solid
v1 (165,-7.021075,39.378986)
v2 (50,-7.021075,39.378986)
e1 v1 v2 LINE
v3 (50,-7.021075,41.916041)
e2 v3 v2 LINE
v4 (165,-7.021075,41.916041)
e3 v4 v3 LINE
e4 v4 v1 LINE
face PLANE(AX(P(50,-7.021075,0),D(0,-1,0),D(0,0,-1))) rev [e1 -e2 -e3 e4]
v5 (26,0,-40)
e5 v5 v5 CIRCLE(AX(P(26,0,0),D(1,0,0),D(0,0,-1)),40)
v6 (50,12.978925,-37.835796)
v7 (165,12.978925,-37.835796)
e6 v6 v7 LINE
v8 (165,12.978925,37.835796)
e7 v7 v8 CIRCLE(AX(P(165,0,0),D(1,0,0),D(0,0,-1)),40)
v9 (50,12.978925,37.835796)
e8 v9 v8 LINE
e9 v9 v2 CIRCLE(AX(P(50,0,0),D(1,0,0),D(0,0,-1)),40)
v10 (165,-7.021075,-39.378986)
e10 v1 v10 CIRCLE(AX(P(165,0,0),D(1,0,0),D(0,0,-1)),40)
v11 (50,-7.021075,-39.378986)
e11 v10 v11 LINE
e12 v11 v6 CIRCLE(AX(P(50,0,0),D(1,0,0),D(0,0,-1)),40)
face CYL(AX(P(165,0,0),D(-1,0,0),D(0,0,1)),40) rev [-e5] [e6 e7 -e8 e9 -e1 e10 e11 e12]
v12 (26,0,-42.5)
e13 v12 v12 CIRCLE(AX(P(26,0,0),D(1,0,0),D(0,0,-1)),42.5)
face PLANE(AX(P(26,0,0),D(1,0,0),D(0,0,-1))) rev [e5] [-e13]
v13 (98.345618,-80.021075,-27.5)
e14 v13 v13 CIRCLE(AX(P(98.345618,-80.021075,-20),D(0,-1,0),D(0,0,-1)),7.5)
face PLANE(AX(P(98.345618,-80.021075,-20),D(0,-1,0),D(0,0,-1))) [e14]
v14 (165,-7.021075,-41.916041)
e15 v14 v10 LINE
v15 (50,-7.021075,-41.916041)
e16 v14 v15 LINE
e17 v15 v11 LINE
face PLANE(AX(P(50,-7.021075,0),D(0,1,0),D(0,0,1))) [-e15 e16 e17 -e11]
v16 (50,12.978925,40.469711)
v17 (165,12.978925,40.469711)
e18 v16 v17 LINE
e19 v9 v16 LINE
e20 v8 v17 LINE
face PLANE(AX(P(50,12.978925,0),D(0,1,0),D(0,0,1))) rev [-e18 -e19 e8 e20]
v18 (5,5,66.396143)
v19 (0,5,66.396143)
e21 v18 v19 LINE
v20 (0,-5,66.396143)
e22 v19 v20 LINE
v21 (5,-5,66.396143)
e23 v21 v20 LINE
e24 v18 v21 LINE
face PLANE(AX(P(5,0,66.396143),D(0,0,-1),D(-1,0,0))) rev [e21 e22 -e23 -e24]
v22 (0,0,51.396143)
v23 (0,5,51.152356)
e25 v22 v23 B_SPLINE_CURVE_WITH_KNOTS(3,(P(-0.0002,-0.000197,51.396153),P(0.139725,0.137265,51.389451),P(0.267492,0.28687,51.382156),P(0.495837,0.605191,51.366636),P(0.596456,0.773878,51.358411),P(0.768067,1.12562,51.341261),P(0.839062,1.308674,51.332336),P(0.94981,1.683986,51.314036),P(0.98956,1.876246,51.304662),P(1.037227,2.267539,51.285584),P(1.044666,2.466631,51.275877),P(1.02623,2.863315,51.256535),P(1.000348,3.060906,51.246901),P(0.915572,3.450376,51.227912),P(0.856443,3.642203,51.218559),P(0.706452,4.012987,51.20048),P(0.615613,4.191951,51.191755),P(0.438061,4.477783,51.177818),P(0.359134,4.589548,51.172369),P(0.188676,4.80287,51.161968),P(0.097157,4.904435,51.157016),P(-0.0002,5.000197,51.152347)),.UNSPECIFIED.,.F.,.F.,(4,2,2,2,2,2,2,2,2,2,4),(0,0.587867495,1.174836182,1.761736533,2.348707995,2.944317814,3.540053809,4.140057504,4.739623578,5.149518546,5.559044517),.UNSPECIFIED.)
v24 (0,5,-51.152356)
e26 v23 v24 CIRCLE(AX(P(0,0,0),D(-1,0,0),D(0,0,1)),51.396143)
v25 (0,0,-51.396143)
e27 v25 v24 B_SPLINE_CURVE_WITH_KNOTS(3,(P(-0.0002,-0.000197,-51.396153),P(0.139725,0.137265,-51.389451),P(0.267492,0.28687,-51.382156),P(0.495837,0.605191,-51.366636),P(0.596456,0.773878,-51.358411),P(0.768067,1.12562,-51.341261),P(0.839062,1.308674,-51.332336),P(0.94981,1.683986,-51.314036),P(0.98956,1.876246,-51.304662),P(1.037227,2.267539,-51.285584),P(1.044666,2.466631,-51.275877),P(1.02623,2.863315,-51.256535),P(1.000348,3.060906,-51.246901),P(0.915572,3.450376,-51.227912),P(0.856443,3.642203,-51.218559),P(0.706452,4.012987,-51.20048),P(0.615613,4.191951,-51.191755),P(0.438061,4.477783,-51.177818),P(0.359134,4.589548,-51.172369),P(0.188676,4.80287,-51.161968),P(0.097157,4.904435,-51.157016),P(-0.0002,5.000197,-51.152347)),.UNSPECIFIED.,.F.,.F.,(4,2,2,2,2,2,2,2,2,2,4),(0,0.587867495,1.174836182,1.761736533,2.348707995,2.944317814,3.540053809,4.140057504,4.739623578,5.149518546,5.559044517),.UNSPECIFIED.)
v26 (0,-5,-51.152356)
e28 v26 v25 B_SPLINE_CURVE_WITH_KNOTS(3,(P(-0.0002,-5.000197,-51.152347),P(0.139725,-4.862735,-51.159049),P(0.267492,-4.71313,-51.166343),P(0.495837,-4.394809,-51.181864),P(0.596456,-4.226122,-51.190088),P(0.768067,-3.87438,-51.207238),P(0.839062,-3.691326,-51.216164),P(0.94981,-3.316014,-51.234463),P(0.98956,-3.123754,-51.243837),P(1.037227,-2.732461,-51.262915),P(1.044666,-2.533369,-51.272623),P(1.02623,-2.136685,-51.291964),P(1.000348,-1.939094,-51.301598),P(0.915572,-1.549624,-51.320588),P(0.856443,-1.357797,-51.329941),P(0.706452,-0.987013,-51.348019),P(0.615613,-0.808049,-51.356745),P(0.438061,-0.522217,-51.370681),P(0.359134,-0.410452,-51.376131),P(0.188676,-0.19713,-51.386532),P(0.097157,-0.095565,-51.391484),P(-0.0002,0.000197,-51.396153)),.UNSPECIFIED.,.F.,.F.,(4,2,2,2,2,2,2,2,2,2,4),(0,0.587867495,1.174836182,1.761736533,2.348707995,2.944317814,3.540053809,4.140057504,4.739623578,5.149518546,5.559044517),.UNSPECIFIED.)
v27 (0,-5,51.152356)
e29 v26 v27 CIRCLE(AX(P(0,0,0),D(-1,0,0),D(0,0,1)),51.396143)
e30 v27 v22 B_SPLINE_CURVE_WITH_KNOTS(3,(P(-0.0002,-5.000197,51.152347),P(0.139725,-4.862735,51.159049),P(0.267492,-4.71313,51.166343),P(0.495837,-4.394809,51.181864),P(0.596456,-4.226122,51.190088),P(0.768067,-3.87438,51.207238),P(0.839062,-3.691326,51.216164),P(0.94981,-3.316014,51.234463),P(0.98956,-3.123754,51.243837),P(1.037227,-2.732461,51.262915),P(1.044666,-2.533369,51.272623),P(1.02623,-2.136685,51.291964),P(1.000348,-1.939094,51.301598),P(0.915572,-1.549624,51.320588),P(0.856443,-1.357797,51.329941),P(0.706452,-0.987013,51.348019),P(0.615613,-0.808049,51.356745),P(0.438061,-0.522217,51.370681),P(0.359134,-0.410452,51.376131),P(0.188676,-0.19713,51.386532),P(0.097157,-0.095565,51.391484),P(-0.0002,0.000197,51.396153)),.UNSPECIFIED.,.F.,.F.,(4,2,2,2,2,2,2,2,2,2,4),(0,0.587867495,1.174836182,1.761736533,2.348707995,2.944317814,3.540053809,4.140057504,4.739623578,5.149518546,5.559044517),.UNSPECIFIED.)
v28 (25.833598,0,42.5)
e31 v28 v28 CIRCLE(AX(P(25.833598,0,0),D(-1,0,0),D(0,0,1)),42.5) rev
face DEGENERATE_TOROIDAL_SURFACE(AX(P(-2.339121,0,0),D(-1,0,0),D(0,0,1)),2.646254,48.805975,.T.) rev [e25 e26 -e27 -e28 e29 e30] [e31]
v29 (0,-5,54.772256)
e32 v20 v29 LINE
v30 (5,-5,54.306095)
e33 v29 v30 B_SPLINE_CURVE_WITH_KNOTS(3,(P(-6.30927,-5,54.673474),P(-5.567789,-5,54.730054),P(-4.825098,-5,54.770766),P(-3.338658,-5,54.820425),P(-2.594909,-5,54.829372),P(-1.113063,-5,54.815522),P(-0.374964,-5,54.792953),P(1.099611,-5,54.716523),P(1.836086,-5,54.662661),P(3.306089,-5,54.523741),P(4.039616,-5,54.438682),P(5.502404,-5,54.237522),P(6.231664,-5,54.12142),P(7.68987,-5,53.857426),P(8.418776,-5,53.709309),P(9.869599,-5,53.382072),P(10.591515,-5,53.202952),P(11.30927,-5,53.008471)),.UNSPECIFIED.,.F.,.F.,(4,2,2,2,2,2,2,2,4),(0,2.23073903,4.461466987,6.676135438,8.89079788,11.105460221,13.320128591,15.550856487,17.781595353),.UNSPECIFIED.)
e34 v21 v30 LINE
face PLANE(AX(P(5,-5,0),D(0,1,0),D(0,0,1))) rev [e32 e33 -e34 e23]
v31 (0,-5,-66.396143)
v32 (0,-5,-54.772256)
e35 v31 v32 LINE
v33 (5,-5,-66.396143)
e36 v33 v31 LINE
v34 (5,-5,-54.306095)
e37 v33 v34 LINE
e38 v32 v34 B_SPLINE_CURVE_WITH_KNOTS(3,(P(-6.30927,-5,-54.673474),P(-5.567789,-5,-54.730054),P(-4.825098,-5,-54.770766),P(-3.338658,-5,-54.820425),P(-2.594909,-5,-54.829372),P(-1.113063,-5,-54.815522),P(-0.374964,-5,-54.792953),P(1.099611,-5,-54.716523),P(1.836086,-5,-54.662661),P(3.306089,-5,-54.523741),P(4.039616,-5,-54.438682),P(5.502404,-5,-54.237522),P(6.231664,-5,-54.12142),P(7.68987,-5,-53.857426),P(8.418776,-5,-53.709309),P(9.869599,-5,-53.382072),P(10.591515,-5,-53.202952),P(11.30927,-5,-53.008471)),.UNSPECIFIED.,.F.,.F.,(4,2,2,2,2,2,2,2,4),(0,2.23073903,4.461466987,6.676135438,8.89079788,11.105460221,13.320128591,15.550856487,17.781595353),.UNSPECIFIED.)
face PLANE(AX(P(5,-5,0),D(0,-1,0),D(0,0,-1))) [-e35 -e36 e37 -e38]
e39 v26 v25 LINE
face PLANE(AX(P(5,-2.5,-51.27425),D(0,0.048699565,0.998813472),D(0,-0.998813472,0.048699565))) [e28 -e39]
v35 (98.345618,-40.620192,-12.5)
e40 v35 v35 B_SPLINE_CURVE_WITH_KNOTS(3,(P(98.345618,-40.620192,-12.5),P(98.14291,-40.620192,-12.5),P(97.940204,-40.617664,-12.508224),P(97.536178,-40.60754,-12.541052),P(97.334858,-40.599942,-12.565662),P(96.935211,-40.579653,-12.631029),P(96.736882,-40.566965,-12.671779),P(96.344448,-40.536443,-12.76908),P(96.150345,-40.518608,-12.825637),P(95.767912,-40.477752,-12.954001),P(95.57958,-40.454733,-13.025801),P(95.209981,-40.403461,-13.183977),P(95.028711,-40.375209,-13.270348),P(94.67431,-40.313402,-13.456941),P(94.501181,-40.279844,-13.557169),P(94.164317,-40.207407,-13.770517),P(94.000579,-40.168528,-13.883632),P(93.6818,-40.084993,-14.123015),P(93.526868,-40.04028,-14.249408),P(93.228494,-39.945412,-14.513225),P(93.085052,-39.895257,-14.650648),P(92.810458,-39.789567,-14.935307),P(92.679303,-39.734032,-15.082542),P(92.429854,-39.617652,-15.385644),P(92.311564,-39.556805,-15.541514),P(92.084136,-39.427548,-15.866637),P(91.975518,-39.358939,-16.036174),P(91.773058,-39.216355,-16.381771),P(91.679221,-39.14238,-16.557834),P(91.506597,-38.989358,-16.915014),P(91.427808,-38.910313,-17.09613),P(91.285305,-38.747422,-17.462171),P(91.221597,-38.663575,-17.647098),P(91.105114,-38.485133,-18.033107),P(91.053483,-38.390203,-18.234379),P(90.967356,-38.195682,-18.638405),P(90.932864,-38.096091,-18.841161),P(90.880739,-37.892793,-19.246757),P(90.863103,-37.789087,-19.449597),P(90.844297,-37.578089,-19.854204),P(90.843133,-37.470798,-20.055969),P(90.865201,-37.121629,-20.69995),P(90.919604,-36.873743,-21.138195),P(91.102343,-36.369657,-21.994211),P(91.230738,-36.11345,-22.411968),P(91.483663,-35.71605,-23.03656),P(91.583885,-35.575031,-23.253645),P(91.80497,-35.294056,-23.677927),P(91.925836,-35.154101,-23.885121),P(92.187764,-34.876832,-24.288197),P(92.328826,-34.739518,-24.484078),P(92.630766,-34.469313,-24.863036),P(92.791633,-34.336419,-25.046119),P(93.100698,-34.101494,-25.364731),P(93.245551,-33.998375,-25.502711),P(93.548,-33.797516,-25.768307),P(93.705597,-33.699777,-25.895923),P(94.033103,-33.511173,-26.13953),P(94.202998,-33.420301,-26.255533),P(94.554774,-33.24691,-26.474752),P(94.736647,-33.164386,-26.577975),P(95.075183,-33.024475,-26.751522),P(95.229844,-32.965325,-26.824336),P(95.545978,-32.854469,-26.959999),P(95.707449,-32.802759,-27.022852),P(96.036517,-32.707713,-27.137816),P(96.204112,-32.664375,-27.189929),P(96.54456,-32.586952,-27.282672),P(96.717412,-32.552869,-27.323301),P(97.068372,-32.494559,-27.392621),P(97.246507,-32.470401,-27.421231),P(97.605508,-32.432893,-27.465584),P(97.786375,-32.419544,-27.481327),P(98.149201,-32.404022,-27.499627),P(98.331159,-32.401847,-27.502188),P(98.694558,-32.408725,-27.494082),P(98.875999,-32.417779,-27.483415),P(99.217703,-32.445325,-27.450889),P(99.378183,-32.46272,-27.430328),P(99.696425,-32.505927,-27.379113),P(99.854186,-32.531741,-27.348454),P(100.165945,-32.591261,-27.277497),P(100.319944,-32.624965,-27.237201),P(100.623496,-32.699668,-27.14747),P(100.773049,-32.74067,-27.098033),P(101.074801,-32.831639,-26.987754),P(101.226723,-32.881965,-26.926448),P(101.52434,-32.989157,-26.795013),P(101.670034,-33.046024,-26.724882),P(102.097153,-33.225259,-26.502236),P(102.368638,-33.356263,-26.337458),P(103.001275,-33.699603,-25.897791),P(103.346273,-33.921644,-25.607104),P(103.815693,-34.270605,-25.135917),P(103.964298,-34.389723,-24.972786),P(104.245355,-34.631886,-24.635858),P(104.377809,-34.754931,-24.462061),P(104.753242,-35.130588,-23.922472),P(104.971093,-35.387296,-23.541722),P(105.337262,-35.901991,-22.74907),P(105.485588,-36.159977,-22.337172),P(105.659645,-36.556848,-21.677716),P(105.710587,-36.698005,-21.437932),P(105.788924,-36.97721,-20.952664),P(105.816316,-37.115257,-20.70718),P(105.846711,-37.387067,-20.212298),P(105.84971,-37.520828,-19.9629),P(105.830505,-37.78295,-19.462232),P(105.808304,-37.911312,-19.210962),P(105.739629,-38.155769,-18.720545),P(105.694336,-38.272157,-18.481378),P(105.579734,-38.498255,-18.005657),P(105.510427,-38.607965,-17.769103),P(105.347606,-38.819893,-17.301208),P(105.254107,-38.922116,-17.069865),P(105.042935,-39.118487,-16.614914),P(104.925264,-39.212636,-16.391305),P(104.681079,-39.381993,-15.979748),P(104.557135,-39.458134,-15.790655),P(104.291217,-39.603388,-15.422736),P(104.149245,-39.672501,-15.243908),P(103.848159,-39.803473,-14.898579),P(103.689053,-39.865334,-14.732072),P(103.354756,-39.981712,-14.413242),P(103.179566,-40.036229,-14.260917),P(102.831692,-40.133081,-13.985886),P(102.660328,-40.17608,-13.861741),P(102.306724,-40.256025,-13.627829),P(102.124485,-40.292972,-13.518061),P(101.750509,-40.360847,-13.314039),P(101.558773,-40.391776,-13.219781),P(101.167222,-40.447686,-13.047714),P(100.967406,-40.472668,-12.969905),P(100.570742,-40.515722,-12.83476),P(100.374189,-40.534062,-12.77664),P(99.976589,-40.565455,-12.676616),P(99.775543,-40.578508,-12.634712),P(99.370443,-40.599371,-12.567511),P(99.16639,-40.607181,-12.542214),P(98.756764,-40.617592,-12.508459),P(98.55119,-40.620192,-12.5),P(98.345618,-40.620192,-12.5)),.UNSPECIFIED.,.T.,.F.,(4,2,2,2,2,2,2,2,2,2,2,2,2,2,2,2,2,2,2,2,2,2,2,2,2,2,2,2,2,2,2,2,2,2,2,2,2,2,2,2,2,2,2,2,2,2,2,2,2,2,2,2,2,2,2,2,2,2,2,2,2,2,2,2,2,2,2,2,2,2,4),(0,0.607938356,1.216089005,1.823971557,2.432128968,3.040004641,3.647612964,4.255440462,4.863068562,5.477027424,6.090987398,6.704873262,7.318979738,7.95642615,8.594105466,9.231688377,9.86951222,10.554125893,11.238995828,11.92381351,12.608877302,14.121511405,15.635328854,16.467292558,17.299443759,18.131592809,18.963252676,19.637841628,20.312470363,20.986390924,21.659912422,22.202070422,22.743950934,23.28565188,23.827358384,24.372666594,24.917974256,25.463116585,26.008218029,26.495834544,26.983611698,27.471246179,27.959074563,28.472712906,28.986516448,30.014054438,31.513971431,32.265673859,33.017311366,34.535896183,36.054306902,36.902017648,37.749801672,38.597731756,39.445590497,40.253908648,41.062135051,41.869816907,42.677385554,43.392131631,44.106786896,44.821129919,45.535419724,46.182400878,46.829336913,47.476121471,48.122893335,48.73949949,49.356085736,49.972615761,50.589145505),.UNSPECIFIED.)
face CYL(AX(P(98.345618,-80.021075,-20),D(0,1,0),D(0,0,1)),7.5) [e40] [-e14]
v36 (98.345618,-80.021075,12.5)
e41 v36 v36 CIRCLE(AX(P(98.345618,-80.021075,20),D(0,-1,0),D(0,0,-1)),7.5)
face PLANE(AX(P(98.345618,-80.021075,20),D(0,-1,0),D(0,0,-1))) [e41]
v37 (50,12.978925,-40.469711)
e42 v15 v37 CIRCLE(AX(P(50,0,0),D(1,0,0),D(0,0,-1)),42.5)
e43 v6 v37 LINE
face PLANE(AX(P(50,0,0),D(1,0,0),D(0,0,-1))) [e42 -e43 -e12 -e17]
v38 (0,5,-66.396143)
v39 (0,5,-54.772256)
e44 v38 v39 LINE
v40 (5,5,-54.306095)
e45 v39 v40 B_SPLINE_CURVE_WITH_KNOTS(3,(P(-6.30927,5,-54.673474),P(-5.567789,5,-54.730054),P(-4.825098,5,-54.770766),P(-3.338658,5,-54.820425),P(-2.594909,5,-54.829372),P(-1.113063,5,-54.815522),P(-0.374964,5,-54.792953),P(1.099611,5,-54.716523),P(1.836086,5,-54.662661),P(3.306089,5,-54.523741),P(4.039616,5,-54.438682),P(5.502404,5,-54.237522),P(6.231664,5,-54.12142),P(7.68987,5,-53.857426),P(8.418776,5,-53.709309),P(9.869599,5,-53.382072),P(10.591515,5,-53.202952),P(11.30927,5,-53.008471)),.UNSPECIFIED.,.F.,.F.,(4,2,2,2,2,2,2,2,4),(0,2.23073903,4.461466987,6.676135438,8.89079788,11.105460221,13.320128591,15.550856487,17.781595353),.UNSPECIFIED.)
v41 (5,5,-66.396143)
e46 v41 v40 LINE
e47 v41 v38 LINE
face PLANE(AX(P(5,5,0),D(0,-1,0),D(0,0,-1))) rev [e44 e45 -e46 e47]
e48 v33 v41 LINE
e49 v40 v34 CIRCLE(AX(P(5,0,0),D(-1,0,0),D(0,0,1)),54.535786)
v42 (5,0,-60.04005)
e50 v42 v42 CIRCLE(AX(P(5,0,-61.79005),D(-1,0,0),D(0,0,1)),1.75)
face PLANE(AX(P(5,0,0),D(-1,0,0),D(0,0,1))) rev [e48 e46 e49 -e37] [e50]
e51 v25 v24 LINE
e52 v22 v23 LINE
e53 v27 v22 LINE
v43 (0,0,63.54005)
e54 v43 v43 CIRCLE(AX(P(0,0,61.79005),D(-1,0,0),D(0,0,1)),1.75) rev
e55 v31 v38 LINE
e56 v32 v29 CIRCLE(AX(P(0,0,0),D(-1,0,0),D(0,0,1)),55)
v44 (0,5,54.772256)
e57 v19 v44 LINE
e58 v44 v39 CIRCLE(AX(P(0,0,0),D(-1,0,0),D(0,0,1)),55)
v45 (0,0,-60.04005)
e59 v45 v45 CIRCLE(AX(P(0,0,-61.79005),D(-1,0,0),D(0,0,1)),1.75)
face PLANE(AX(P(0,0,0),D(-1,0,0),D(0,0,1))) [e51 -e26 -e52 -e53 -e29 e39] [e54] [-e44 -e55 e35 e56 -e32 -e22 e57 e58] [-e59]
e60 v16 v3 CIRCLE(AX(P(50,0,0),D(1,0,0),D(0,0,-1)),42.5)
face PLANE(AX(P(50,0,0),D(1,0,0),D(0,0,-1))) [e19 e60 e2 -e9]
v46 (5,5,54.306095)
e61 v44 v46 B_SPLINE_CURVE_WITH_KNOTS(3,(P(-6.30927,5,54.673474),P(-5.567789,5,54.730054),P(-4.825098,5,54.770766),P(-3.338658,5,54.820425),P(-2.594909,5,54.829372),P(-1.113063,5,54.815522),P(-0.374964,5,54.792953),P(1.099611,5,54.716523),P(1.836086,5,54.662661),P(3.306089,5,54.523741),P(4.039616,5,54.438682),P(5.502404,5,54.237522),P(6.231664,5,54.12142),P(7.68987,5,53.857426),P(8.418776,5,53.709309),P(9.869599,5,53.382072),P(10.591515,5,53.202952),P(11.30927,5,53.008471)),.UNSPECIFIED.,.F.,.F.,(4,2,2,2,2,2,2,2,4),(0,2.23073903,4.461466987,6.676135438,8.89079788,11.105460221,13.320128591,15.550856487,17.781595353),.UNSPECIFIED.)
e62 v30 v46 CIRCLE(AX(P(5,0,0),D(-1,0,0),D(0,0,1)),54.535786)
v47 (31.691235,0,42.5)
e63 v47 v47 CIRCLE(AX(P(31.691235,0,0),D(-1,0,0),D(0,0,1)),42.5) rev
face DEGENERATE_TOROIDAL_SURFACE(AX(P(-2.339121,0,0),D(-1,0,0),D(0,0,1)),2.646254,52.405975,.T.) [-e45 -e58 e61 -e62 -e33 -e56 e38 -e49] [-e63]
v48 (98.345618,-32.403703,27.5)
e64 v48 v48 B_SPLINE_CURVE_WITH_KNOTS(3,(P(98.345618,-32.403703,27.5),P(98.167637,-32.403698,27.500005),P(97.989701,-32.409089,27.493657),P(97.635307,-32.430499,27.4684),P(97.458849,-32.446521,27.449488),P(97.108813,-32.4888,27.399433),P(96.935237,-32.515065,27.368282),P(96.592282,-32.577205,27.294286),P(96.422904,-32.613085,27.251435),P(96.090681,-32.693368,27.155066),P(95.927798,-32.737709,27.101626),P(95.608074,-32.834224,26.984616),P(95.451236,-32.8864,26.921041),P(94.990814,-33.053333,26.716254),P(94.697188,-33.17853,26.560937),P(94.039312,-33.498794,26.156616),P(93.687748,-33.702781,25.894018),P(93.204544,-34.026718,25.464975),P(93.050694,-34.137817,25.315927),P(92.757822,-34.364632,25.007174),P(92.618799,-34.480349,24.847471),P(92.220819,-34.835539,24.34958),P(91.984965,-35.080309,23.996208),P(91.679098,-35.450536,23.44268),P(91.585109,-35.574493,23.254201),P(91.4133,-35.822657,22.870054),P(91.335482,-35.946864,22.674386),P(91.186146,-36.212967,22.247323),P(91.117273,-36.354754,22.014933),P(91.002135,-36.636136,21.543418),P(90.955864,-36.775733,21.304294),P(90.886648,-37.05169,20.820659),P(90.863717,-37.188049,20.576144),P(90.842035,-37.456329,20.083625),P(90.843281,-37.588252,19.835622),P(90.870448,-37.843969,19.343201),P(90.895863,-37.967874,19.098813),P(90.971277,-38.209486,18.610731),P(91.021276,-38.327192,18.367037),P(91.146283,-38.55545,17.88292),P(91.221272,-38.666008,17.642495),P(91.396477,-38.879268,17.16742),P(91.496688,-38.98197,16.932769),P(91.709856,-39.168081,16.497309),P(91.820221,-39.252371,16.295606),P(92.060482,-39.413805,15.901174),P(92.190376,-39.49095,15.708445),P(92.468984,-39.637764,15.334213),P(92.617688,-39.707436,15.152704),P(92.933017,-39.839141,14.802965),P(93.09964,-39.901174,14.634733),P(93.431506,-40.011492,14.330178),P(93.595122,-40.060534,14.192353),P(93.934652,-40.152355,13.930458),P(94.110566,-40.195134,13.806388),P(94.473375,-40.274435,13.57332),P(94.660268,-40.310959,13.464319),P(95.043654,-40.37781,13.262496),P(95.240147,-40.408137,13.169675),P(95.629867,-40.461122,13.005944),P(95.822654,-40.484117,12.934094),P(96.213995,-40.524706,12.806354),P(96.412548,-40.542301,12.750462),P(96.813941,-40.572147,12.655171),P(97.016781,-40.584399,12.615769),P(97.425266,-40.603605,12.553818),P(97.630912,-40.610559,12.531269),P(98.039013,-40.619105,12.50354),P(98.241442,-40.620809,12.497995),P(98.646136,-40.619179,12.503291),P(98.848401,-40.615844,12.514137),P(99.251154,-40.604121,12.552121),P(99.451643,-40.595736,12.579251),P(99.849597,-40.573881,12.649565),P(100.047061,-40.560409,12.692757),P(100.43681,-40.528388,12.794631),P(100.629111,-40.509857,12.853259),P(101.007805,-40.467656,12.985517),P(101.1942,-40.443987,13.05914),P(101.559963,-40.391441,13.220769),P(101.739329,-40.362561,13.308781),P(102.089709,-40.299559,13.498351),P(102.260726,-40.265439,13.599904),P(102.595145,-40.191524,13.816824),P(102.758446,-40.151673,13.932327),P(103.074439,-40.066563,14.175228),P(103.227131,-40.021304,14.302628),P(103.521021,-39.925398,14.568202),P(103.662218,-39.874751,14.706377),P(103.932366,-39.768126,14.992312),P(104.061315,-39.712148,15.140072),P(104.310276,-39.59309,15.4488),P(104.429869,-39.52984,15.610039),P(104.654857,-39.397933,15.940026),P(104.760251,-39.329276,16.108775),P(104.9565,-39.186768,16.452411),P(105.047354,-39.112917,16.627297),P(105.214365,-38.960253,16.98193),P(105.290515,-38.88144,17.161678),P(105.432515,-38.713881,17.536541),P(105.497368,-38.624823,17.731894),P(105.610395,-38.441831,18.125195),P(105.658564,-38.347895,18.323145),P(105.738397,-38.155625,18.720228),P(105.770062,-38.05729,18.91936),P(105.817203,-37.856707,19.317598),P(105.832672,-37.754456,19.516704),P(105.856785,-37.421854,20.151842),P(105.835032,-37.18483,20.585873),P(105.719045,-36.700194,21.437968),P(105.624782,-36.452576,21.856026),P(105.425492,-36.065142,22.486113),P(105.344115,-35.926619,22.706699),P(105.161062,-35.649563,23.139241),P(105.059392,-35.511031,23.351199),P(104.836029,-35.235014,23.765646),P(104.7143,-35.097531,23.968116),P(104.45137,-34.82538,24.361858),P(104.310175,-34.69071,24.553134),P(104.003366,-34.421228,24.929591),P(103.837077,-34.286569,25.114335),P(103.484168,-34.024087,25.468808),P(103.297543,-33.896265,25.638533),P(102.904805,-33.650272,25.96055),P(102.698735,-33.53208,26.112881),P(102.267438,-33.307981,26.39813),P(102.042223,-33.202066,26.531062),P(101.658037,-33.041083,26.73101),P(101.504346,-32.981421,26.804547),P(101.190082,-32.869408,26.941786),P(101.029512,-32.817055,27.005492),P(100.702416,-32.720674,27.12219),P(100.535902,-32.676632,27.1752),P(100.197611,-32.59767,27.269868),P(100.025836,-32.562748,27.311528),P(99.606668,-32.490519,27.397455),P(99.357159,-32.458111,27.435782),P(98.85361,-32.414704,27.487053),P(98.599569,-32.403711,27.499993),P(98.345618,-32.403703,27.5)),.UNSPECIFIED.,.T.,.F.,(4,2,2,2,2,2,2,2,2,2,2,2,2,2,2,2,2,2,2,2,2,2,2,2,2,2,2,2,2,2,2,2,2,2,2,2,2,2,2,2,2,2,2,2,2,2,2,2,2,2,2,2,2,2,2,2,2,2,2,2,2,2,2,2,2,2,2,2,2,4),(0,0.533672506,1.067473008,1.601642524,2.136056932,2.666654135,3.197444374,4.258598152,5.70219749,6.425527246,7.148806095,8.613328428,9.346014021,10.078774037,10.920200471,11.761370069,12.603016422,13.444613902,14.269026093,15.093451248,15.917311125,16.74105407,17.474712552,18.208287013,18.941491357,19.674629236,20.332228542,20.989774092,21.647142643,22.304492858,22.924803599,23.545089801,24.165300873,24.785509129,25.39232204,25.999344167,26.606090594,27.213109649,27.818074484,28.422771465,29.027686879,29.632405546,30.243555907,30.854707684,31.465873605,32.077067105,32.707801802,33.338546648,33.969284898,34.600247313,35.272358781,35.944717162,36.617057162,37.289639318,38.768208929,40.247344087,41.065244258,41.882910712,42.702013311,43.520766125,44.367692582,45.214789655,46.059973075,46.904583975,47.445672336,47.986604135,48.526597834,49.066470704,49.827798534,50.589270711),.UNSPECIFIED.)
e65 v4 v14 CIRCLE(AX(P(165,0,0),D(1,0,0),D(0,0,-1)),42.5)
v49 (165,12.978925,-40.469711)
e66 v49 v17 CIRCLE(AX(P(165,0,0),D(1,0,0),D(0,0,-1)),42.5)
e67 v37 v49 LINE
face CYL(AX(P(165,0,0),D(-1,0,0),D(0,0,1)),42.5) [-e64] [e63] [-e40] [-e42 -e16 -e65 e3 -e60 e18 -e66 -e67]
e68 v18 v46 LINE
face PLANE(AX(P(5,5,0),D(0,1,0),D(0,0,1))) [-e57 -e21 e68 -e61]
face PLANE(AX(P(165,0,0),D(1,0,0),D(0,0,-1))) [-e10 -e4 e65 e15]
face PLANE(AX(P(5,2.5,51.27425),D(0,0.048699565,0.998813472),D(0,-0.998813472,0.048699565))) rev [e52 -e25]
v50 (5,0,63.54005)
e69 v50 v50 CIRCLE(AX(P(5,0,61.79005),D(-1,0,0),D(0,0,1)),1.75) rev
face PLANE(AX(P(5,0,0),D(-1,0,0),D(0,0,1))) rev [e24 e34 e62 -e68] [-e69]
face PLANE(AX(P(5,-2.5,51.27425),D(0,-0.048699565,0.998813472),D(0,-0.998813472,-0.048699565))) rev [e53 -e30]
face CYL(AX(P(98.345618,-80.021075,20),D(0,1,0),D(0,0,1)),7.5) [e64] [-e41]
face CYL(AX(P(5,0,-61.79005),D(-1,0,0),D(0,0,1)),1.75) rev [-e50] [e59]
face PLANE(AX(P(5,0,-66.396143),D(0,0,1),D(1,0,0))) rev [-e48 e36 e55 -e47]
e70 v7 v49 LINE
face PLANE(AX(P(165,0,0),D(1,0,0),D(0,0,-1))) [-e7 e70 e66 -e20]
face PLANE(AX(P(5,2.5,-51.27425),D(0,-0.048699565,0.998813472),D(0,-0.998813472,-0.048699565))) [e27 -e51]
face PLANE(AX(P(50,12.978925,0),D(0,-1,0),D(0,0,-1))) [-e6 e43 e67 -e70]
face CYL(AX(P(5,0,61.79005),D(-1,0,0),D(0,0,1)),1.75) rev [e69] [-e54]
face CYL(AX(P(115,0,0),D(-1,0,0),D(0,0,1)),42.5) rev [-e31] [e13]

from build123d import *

# Parameters (mm, degrees)
CUT_EXTRUDE1_DEPTH              = 85
CUT_EXTRUDE1_DEPTH_BACK         = 30
SKETCH2_R                       = 42.5
BOSS_EXTRUDE1_DEPTH             = 135
BOSS_EXTRUDE1_DEPTH_BACK        = 4
SKETCH3_R                       = 42.5
SKETCH3_R_2                     = 40
CUT_EXTRUDE2_START              = -115
CUT_EXTRUDE2_DEPTH              = 115
BOSS_EXTRUDE3_REACH             = 208.879
BOSS_EXTRUDE3_END_RADIUS        = 42.5
SKETCH7_R                       = 7.5
BOSS_EXTRUDE3_DIRECTION_2_DEPTH = 23
SKETCH8_R                       = 1.75
BOSS_EXTRUDE4_DEPTH             = 5


# Read off the part's stored shape, not the designer's step: Shell1
with BuildPart() as part:
    # Sketch1 → Revolve1 (revolve)
    with BuildSketch(Plane(origin=(0, 0, 0), x_dir=(1, 0, 0), z_dir=(0, 1, 0))):
        with BuildLine():
            Line((0, 0), (50, 0))
            ThreePointArc((50, 0), (36.43816018, 37.898327436), (0, 55))
            Line((0, 55), (0, 0))
        make_face()
    revolve(axis=Axis((0, 0, 0), (1, 0, 0)))

    # Shell1 outline → Shell1 (revolve, cut)
    with BuildSketch(Plane.YX):
        with BuildLine():
            add(Edge.make_bspline(
                [(51.396143239, 0), (50.757559449, 13.308797838), (45.305252471, 29.157669604), (32.638691052, 41.565710517), (16.262834021, 46.466854434), (2.111028419, 46.466854274), (1.578625505, 46.459517426), (1.049215582, 46.444998454), (0.522958084, 46.423458206), (0, 46.395061716)],
                knots=[4.717788708, 4.717788708, 4.717788708, 4.717788708, 4.717788708, 4.717788708, 6.23524, 6.23524, 6.23524, 6.23524, 6.294886198, 6.294886198, 6.294886198, 6.294886198, 6.294886198, 6.294886198], degree=5, weights=[1, 1, 0.970217445, 0.968892719, 1, 1, 1.000000024, 1.000000027, 1, 1]))
            Line((0, 46.395061716), (0, 0))
            Line((0, 0), (51.396143239, 0))
        make_face()
    revolve(axis=Axis((0, 0, 0), (1, 0, 0)), mode=Mode.SUBTRACT)

    # Sketch2 → Cut-Extrude1 (cut, two sides: drawn at the far end of the back side and taken through both)
    with BuildSketch(Plane(origin=(30, 0, 0), x_dir=(0, 0, -1), z_dir=(1, 0, 0)).offset(-CUT_EXTRUDE1_DEPTH_BACK)):
        with Locations(Location((0, 0, 0), (0, 0, 180))):
            Circle(SKETCH2_R)
    extrude(amount=CUT_EXTRUDE1_DEPTH + CUT_EXTRUDE1_DEPTH_BACK, mode=Mode.SUBTRACT)

    # Sketch3 → Boss-Extrude1 (add, two sides: drawn at the far end of the back side and taken through both)
    with BuildSketch(Plane(origin=(30, 0, 0), x_dir=(0, 0, -1), z_dir=(1, 0, 0)).offset(-BOSS_EXTRUDE1_DEPTH_BACK)):
        with Locations(Location((0, 0, 0), (0, 0, 180))):
            Circle(SKETCH3_R)
        Circle(SKETCH3_R_2, mode=Mode.SUBTRACT)
    extrude(amount=BOSS_EXTRUDE1_DEPTH + BOSS_EXTRUDE1_DEPTH_BACK)

    # Sketch4 → Cut-Extrude2 (cut)
    with BuildSketch(Plane(origin=(165, 0, 0), x_dir=(0, 0, -1), z_dir=(1, 0, 0)).offset(CUT_EXTRUDE2_START)):
        with BuildLine():
            Line((45.575841937, 12.978925493), (40.46971081, 12.978925493))
            ThreePointArc((40.46971081, 12.978925493), (41.989360018, 6.568382243), (42.5, 0))
            ThreePointArc((42.5, 0), (42.353758703, -3.522658622), (41.916041234, -7.021074507))
            Line((41.916041234, -7.021074507), (45.575841937, -7.021074507))
            Line((45.575841937, -7.021074507), (45.575841937, 12.978925493))
        make_face()
        with BuildLine():
            ThreePointArc((40, 0), (39.455239564, 6.579063078), (37.835796451, 12.978925493))
            Line((37.835796451, 12.978925493), (35.575841937, 12.978925493))
            Line((35.575841937, 12.978925493), (35.575841937, 2.978925493))
            Line((35.575841937, 2.978925493), (35.575841937, -7.021074507))
            Line((35.575841937, -7.021074507), (39.378985675, -7.021074507))
            ThreePointArc((39.378985675, -7.021074507), (39.844443948, -3.524242686), (40, 0))
        make_face()
        with BuildLine():
            ThreePointArc((42.5, 0), (41.989360018, 6.568382243), (40.46971081, 12.978925493))
            Line((40.46971081, 12.978925493), (37.835796451, 12.978925493))
            ThreePointArc((37.835796451, 12.978925493), (39.455239564, 6.579063078), (40, 0))
            ThreePointArc((40, 0), (39.844443948, -3.524242686), (39.378985675, -7.021074507))
            Line((39.378985675, -7.021074507), (41.916041234, -7.021074507))
            ThreePointArc((41.916041234, -7.021074507), (42.353758703, -3.522658622), (42.5, 0))
        make_face()
        with BuildLine():
            Line((-37.835796451, 12.978925493), (-40.46971081, 12.978925493))
            ThreePointArc((-40.46971081, 12.978925493), (-42.389303309, 3.065446952), (-41.916041234, -7.021074507))
            Line((-41.916041234, -7.021074507), (-39.378985675, -7.021074507))
            ThreePointArc((-39.378985675, -7.021074507), (-39.881457404, 3.077231765), (-37.835796451, 12.978925493))
        make_face()
        with BuildLine():
            Line((-35.575841937, 12.978925493), (-37.835796451, 12.978925493))
            ThreePointArc((-37.835796451, 12.978925493), (-39.881457404, 3.077231765), (-39.378985675, -7.021074507))
            Line((-39.378985675, -7.021074507), (-35.575841937, -7.021074507))
            Line((-35.575841937, -7.021074507), (-35.575841937, 2.978925493))
            Line((-35.575841937, 2.978925493), (-35.575841937, 12.978925493))
        make_face()
    extrude(amount=CUT_EXTRUDE2_DEPTH, mode=Mode.SUBTRACT)

    # Boss-Extrude3: up to this cylinder (the profile starts outside it)
    boss_extrude3_end = Plane(origin=(98.345618, 0, 0), z_dir=(-1, 0, 0)) * Cylinder(BOSS_EXTRUDE3_END_RADIUS, 503.758, mode=Mode.PRIVATE)
    # Sketch7 → Boss-Extrude3 (add, up to the surface)
    with BuildSketch(Plane(origin=(0, -57.021074507, 0), x_dir=(-1, 0, 0), z_dir=(0, -1, 0)), mode=Mode.PRIVATE) as boss_extrude3_sk1:
        with Locations(Location((-98.345617605, 20, 0), (0, 0, 270))):
            Circle(SKETCH7_R)
    boss_extrude3_tool1 = extrude(boss_extrude3_sk1.sketch, amount=-BOSS_EXTRUDE3_REACH, mode=Mode.PRIVATE) - boss_extrude3_end
    add(boss_extrude3_tool1.solids().sort_by_distance((98.345618, -57.021075, -20))[0])
    # Sketch7 → Boss-Extrude3 (add, up to the surface)
    with BuildSketch(Plane(origin=(0, -57.021074507, 0), x_dir=(-1, 0, 0), z_dir=(0, -1, 0)), mode=Mode.PRIVATE) as boss_extrude3_sk2:
        with Locations(Location((-98.345617605, -20, 0), (0, 0, 270))):
            Circle(SKETCH7_R)
    boss_extrude3_tool2 = extrude(boss_extrude3_sk2.sketch, amount=-BOSS_EXTRUDE3_REACH, mode=Mode.PRIVATE) - boss_extrude3_end
    add(boss_extrude3_tool2.solids().sort_by_distance((98.345618, -57.021075, 20))[0])

    # Sketch7 → Boss-Extrude3 direction 2 (add)
    with BuildSketch(Plane(origin=(0, -57.021074507, 0), x_dir=(-1, 0, 0), z_dir=(0, -1, 0))):
        with Locations(Location((-98.345617605, 20, 0), (0, 0, 270))):
            Circle(SKETCH7_R)
        with Locations(Location((-98.345617605, -20, 0), (0, 0, 270))):
            Circle(SKETCH7_R)
    extrude(amount=BOSS_EXTRUDE3_DIRECTION_2_DEPTH)

    # Sketch8 → Boss-Extrude4 (add)
    # profile 1 of 2: a face of its own
    with BuildSketch(Plane.ZY):
        Polygon((66.396143239, 0), (66.396143239, 5), (51.152356151, 5), (51.396143239, 0), (51.152356151, -5), (66.396143239, -5), align=None)
        with Locations((61.79005008, 0)):
            Circle(SKETCH8_R, mode=Mode.SUBTRACT)
    # profile 2 of 2: a face of its own
    with BuildSketch(Plane.ZY):
        Polygon((-51.152356151, -5), (-51.396143239, 0), (-51.152356151, 5), (-66.396143239, 5), (-66.396143239, 0), (-66.396143239, -5), align=None)
        with Locations((-61.79005008, 0)):
            Circle(SKETCH8_R, mode=Mode.SUBTRACT)
    extrude(amount=-BOSS_EXTRUDE4_DEPTH)


solid = part.part
